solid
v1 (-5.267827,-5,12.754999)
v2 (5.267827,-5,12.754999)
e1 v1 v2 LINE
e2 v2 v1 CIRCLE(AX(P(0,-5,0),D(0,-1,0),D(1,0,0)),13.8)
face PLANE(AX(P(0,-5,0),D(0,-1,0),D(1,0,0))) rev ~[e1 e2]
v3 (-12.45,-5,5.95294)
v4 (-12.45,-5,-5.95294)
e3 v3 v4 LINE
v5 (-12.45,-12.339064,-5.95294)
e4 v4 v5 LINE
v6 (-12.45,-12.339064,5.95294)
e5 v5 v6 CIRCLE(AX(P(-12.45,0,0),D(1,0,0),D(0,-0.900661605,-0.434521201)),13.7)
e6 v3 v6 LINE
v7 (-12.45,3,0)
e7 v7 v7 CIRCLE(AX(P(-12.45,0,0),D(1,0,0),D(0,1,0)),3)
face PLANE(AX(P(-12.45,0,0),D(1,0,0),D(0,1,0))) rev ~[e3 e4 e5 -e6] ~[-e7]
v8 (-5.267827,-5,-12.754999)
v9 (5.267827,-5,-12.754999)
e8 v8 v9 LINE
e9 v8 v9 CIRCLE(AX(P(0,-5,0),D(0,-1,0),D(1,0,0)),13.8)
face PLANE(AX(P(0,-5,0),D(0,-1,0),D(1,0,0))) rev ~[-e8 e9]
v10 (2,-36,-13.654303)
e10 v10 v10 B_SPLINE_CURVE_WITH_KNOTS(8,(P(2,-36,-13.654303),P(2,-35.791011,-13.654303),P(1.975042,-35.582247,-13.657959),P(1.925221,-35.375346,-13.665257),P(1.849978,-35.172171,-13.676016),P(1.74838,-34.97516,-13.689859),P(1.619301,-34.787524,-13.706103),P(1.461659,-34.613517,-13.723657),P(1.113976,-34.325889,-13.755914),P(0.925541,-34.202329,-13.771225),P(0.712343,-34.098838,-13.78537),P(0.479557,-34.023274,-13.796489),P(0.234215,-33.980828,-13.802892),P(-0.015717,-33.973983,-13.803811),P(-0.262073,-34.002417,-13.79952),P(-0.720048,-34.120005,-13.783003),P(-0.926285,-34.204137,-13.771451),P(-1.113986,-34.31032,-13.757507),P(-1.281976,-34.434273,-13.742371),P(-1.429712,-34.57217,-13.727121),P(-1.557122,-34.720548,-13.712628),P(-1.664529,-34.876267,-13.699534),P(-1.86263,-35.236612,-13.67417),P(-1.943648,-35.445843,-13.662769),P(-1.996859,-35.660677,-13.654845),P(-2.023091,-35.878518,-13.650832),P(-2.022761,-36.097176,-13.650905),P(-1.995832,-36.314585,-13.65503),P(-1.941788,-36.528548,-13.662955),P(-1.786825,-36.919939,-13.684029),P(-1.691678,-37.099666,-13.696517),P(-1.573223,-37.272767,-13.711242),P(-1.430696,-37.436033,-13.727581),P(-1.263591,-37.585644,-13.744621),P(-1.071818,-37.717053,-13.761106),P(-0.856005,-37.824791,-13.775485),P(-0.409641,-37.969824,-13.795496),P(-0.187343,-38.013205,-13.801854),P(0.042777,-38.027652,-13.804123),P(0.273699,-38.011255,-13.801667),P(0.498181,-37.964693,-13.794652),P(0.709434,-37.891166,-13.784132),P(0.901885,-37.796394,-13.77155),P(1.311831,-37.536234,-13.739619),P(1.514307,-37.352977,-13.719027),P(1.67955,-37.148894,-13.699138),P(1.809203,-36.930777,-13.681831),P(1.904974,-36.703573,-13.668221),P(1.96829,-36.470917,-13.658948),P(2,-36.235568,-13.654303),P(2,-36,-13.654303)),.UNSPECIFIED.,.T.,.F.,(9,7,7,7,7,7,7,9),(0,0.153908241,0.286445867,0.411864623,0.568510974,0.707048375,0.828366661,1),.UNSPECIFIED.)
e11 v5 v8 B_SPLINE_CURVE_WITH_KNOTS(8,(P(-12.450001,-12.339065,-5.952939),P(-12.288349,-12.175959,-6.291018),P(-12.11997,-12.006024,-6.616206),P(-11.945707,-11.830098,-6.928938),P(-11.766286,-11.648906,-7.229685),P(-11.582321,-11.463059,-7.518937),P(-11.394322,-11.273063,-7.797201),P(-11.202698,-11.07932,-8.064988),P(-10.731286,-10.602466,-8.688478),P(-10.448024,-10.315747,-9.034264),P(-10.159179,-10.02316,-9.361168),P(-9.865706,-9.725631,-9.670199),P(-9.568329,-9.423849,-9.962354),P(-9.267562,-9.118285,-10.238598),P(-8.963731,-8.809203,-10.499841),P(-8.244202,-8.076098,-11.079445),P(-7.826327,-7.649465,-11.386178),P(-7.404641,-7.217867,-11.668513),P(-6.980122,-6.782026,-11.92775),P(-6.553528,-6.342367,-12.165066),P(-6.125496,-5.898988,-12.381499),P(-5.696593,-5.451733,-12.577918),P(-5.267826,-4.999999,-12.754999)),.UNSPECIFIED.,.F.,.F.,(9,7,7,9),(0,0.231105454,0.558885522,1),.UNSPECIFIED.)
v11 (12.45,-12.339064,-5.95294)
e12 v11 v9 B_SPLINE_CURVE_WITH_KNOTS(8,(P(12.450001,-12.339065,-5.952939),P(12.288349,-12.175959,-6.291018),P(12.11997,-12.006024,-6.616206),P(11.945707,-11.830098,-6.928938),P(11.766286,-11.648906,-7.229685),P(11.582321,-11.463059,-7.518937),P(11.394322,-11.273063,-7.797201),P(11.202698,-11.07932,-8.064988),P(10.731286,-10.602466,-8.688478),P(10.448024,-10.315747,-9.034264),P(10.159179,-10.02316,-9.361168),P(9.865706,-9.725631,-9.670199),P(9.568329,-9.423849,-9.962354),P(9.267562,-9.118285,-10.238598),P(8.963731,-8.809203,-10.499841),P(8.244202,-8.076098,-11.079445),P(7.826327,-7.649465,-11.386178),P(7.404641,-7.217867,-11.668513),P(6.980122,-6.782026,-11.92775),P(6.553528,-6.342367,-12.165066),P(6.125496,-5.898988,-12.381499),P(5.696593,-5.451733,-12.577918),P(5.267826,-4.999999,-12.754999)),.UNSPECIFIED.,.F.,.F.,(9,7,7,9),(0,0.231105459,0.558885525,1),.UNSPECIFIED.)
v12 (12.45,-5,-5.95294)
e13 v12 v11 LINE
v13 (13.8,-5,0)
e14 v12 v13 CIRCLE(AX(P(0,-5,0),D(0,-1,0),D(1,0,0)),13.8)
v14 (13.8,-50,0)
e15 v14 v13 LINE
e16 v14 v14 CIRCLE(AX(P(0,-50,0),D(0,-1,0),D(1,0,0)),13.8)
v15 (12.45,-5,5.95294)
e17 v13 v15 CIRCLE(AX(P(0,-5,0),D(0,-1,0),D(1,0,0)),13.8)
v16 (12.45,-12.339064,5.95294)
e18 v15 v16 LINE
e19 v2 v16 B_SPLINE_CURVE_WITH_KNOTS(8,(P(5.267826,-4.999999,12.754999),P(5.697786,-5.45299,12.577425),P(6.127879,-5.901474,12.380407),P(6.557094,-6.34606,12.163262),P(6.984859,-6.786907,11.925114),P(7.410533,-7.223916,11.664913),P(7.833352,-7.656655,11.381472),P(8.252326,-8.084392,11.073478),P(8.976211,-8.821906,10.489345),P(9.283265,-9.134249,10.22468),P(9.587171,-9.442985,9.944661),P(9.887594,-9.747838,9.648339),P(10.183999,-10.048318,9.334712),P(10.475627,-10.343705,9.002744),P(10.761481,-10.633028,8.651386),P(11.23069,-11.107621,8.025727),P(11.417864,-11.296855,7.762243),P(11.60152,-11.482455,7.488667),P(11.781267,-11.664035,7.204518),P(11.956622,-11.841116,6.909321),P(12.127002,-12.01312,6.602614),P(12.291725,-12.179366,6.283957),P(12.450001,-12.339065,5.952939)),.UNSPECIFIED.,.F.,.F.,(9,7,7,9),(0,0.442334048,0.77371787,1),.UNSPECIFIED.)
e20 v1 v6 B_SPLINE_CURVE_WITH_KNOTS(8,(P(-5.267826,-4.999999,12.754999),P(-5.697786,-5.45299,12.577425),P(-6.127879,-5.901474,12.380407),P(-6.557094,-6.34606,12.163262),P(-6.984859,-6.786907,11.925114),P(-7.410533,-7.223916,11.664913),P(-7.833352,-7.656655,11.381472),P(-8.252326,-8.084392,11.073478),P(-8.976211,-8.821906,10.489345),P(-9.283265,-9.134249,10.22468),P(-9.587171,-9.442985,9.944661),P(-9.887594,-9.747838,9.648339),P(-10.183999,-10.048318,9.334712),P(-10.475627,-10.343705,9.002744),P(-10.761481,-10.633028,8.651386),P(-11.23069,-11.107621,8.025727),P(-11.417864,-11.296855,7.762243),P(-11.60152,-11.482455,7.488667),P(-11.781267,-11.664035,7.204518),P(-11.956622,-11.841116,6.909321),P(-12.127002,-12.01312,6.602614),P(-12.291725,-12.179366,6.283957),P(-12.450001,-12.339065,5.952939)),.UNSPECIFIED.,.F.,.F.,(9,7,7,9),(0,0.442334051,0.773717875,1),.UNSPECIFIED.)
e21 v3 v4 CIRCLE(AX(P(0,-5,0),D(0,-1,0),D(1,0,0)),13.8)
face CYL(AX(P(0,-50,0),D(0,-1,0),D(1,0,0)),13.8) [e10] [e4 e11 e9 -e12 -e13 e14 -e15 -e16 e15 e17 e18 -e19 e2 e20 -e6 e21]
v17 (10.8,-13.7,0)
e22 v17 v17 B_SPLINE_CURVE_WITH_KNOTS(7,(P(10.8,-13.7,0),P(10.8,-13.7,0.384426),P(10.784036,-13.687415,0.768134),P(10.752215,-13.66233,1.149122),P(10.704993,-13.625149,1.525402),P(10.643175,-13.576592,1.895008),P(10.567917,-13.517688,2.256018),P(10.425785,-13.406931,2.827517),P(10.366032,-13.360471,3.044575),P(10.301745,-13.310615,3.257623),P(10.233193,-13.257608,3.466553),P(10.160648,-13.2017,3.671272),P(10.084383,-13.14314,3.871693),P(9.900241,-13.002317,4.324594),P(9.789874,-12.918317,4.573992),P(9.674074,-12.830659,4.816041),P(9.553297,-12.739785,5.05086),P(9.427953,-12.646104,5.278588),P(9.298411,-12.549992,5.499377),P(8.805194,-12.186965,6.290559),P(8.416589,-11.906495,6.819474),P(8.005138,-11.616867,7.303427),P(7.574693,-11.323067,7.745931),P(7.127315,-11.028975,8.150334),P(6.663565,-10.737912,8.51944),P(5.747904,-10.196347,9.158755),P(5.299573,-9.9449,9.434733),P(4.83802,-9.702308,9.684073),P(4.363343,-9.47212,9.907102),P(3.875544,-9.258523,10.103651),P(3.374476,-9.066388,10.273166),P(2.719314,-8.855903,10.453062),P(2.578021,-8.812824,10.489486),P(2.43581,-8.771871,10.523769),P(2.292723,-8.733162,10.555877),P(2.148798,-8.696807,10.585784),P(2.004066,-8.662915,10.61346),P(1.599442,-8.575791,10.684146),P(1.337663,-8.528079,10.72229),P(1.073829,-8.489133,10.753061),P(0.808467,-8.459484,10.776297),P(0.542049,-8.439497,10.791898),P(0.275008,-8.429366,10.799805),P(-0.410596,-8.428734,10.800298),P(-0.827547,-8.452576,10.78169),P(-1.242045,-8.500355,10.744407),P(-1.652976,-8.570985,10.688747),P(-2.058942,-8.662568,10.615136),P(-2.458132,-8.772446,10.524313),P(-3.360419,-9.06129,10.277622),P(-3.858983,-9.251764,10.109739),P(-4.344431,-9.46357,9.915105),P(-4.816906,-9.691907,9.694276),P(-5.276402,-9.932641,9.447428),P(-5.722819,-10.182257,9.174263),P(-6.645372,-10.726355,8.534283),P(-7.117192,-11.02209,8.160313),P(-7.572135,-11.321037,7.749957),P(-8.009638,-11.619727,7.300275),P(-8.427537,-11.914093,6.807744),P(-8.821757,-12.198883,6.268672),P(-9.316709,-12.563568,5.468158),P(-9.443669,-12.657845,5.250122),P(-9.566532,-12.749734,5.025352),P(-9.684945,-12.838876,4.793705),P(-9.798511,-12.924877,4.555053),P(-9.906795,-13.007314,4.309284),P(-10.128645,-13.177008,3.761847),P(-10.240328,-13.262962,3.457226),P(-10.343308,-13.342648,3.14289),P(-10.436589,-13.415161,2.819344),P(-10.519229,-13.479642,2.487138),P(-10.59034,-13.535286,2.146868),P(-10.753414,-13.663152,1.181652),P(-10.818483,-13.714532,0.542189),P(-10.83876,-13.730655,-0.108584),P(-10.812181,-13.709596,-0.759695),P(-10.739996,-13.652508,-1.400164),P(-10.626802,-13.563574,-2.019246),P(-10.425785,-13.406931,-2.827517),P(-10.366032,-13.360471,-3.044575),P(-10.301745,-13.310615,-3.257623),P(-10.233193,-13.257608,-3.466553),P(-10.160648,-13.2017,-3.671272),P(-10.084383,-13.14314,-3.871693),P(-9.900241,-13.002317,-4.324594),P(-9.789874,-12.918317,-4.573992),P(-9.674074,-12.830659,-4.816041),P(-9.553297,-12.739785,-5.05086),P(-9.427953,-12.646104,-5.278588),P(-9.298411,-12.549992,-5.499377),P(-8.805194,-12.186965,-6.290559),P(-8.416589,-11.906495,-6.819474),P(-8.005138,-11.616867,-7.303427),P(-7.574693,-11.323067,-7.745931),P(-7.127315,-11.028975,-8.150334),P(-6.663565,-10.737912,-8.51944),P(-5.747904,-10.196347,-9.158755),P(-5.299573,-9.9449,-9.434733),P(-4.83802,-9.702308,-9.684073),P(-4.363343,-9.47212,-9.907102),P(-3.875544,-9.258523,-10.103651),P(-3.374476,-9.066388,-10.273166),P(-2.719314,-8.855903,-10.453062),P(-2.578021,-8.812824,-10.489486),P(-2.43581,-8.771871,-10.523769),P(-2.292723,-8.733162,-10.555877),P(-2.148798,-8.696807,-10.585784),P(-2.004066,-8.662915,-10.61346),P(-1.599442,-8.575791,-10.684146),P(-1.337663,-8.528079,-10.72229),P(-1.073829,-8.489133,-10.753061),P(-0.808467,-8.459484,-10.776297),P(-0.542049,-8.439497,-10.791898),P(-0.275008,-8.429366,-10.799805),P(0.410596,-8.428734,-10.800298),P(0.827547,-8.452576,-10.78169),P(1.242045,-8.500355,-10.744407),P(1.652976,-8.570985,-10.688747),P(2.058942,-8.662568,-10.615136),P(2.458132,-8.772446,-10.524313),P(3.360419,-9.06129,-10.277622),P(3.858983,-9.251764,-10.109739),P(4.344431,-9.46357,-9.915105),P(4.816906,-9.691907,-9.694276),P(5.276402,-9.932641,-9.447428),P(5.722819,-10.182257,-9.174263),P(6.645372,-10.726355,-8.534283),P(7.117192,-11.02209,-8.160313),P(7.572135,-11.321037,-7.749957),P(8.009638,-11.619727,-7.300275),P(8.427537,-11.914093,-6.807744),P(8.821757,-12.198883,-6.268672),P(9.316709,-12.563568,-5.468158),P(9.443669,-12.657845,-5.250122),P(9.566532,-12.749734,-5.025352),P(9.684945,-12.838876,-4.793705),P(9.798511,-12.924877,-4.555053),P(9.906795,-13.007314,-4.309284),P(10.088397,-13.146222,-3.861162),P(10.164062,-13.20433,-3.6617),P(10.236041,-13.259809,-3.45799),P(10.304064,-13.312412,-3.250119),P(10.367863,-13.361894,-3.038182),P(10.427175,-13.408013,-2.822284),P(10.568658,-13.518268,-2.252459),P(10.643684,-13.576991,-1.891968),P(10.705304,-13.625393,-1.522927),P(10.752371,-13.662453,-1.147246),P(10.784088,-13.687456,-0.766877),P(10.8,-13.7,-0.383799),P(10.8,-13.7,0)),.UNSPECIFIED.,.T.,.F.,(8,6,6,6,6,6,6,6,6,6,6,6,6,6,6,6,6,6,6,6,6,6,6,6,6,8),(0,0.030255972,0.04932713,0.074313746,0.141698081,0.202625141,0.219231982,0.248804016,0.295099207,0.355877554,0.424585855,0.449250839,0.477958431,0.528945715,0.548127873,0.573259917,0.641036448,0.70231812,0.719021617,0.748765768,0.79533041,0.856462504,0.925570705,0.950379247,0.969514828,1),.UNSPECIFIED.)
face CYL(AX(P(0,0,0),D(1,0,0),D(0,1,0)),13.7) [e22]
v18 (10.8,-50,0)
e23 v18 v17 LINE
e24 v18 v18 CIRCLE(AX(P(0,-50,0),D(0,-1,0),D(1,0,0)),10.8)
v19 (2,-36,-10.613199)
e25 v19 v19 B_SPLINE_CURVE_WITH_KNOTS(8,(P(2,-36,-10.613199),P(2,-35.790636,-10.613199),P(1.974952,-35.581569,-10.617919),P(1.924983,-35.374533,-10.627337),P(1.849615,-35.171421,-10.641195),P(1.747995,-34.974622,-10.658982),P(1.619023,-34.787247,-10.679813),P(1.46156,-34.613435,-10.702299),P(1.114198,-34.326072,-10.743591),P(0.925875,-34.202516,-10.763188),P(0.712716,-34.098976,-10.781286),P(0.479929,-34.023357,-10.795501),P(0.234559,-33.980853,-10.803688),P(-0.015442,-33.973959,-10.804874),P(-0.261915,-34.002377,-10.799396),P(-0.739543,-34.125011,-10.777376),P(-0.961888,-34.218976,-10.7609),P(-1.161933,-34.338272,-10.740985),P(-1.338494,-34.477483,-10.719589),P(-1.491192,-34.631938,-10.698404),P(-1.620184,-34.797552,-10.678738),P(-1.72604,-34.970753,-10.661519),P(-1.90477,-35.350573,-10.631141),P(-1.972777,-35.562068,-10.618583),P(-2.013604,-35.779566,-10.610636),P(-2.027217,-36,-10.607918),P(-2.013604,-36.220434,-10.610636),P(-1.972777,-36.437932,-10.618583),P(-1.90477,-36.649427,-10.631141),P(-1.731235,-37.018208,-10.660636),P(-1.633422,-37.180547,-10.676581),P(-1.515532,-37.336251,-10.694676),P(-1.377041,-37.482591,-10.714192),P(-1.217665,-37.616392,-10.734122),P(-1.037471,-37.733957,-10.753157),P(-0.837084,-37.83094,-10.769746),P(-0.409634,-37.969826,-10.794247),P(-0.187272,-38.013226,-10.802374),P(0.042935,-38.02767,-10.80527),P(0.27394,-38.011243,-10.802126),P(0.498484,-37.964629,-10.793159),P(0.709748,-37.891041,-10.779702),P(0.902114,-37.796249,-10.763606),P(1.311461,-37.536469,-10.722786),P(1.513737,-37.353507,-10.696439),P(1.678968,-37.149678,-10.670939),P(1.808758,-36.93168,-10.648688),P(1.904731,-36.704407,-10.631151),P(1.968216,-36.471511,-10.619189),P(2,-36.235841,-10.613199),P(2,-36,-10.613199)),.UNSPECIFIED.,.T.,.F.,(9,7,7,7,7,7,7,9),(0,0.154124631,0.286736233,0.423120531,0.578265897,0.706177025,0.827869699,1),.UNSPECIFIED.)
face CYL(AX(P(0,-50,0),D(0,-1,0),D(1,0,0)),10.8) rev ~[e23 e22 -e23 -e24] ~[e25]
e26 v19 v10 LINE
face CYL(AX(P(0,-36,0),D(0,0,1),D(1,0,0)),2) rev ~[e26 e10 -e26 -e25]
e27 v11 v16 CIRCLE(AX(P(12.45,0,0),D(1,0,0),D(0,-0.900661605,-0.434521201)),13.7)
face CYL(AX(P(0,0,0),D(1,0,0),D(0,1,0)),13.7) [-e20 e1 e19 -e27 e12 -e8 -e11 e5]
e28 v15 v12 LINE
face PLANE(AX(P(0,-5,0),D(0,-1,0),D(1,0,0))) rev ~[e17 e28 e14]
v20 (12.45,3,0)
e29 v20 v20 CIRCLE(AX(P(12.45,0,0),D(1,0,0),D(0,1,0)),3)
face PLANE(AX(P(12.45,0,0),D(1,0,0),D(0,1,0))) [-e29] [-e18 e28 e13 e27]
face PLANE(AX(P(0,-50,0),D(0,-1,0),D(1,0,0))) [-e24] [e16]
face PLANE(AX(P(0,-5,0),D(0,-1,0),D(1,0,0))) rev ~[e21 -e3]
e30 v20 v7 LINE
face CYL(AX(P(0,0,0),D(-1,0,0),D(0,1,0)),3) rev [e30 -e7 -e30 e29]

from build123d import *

# Parameters (mm, degrees)
F2_R     = 13.7
F2_R_2   = 3
F3_DEPTH = 12.45
F1_R     = 13.8
F1_R_2   = 10.8
F4_DEPTH = 45
F6_D     = 4
F6_DEPTH = 13.8010001


with BuildPart() as f3:
    # F2 (on Right) → F3 (new body, symmetric)
    with BuildSketch(Plane.YZ):
        Circle(F2_R)
        Circle(F2_R_2, mode=Mode.SUBTRACT)
    extrude(amount=F3_DEPTH, both=True)

    # F1 (on offset) → F4 (join)
    with BuildSketch(Plane.XZ.offset(50)):
        Circle(F1_R)
        Circle(F1_R_2, mode=Mode.SUBTRACT)
    extrude(amount=-F4_DEPTH)

    # F6 (through all, one way)
    with BuildSketch(Plane.XY):
        with Locations((0, -36)):
            Circle(F6_D / 2)
    extrude(amount=-F6_DEPTH, mode=Mode.SUBTRACT)


solid = f3.part
